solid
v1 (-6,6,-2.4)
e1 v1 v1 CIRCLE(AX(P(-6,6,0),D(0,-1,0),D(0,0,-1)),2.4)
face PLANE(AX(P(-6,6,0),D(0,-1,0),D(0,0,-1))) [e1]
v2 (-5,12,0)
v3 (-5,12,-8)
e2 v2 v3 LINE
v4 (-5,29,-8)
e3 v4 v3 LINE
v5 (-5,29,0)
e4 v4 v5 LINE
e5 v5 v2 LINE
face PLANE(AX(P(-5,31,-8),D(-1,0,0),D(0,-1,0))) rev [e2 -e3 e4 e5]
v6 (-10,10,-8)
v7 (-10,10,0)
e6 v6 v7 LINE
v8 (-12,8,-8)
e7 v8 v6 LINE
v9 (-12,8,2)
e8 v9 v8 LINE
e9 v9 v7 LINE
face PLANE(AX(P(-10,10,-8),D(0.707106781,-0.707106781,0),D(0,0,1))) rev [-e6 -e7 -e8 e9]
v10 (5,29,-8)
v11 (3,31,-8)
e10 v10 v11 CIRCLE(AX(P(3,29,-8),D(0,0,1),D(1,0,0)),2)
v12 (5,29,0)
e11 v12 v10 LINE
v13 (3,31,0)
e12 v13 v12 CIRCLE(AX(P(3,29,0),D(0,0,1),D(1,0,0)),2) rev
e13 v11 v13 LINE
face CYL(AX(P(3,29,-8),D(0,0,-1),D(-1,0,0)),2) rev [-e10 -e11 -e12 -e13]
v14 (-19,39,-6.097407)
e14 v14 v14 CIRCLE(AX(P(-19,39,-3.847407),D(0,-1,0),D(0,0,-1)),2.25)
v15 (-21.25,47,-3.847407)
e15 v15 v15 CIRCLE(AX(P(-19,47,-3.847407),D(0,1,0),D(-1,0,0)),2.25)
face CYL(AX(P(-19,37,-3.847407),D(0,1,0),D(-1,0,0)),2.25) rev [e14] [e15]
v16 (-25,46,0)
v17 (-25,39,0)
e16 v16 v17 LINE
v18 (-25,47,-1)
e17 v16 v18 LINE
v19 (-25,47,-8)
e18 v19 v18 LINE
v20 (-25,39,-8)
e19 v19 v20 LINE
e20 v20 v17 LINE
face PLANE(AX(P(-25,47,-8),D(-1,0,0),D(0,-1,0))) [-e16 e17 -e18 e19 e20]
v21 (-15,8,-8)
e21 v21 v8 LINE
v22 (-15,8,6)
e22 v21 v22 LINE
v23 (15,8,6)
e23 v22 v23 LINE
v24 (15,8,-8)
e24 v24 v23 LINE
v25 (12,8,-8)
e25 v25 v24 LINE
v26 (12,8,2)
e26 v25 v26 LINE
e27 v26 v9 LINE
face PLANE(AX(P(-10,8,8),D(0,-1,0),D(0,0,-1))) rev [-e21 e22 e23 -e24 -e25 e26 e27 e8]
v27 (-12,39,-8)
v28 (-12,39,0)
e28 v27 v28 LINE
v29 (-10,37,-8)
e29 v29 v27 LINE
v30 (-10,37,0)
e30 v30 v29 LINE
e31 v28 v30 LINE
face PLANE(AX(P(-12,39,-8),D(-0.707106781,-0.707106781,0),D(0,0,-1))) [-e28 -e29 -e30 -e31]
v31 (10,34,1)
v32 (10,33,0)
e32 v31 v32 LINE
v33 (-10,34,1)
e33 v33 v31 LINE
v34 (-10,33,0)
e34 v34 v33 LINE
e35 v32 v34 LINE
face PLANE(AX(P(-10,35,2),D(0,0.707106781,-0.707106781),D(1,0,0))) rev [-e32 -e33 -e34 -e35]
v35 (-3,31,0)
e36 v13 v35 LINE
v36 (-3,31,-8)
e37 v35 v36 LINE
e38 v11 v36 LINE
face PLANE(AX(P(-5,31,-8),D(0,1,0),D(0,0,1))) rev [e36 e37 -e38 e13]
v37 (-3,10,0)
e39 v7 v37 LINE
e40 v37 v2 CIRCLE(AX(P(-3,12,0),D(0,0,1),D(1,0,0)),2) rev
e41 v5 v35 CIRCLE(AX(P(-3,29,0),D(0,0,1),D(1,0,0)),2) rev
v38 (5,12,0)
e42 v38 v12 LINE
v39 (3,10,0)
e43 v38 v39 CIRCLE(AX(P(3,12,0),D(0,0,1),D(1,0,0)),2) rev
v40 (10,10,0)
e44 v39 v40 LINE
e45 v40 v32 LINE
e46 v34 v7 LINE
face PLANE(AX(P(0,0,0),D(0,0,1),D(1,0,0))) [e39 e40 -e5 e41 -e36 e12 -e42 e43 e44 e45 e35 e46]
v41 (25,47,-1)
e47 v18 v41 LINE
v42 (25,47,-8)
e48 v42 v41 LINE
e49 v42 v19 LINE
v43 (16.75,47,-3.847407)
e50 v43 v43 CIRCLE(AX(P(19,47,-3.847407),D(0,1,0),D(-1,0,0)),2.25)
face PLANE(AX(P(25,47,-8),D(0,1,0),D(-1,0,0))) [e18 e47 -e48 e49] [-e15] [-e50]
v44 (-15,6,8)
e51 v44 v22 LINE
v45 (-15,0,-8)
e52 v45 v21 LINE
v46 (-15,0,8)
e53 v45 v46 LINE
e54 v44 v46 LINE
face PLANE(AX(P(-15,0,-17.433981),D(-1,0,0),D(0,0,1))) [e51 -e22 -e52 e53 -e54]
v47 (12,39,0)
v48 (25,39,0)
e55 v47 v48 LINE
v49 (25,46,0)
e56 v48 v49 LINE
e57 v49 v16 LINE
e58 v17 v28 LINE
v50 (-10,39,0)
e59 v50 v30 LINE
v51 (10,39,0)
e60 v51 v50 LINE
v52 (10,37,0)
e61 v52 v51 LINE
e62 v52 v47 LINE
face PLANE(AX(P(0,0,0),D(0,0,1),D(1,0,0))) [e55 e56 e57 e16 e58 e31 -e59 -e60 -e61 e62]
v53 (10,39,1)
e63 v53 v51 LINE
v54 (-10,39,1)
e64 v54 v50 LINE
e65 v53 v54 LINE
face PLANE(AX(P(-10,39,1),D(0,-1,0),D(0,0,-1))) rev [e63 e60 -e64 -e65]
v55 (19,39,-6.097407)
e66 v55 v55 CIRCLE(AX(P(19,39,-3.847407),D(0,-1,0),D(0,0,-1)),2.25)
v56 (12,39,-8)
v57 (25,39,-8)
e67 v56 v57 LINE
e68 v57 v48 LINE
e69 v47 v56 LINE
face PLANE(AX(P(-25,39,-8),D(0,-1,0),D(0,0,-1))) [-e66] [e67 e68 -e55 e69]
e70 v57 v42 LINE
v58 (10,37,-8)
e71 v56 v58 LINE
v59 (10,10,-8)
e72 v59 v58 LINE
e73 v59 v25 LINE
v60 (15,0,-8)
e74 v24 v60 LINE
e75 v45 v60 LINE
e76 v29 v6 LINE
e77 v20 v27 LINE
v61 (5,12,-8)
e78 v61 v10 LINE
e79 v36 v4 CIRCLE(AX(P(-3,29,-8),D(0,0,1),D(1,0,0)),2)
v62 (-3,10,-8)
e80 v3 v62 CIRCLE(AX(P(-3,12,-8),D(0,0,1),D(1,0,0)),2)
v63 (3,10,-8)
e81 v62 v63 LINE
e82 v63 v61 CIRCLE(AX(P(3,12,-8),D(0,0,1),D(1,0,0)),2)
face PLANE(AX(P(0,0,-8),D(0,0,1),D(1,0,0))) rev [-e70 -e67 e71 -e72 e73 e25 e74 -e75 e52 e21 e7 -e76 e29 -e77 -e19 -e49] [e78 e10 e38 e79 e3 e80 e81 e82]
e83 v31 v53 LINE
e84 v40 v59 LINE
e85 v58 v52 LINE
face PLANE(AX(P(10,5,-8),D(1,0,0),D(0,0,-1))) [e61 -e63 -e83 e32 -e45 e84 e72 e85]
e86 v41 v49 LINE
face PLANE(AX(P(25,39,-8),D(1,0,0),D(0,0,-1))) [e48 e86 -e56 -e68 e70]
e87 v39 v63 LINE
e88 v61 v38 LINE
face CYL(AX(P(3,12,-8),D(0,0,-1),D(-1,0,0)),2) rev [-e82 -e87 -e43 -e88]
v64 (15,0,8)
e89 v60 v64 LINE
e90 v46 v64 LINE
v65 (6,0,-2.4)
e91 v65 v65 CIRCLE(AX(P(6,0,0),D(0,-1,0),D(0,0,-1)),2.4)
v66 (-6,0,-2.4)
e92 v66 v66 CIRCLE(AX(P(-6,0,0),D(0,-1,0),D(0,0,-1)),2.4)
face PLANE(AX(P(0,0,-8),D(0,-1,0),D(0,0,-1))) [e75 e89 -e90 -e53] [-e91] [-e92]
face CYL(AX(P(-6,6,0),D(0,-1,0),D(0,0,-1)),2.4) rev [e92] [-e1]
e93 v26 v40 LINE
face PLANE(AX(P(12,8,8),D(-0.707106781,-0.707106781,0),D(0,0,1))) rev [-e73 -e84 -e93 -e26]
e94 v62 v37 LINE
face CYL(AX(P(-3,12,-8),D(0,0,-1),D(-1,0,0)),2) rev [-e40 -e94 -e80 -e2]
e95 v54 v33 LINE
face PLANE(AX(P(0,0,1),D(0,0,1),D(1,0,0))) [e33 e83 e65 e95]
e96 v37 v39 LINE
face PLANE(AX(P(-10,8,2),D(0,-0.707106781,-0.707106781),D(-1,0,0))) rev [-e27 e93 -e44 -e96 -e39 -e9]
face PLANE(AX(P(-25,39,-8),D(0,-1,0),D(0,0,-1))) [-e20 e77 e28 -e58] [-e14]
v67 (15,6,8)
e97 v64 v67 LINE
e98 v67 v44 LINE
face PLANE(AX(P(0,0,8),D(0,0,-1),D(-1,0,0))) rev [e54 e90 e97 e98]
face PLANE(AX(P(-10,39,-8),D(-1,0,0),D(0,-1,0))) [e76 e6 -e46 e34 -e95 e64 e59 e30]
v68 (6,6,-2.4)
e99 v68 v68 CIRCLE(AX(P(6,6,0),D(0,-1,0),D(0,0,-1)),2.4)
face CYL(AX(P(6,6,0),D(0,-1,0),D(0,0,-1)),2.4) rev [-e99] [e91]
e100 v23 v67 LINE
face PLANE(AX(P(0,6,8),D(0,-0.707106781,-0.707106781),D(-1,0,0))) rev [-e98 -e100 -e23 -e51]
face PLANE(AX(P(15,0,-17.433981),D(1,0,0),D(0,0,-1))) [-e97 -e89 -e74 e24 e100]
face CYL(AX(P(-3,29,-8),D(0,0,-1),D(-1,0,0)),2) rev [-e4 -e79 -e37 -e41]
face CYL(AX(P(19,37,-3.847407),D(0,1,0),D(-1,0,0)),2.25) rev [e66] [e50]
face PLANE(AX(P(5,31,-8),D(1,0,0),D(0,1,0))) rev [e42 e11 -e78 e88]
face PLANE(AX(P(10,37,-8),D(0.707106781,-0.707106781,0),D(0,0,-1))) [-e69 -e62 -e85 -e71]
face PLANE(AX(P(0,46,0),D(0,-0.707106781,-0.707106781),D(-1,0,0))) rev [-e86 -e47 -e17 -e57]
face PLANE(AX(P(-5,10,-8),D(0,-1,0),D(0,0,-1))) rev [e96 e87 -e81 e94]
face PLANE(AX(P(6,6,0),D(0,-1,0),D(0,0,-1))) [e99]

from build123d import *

# Parameters (mm, degrees)
EXTRUDE_1_DEPTH     = 8
SKETCH_3_W          = 20
SKETCH_3_H          = 4
EXTRUDE_2_DEPTH     = 1
SKETCH_4_R          = 2.25
CUT_EXTRUDE_3_DEPTH = 10
CHAMFER_2_SIZE      = 1
CHAMFER_3_SIZE      = 2
CHAMFER_4_SIZE      = 2
SKETCH_6_W          = 20
SKETCH_6_H          = 8
EXTRUDE_3_DEPTH     = 8
SKETCH_7_W          = 10
SKETCH_7_H          = 21
CUT_EXTRUDE_4_DEPTH = 54.833075335
FILLET_1_R          = 2
SKETCH_8_R          = 2.4
CUT_EXTRUDE_5_DEPTH = 6
SKETCH_9_W          = 5
SKETCH_9_H          = 8
EXTRUDE_4_DEPTH     = 16
CHAMFER_5_SIZE      = 2
CHAMFER_6_SIZE      = 2


# Some blends are built 0.0001 mm under size
with BuildPart() as part:
    # ｽｹｯﾁ1 → ﾎﾞｽ - 押し出し1 (new body)
    with BuildSketch(Plane.XY):
        Polygon((-10, 0), (0, 0), (10, 0), (10, 5), (0, 5), (-10, 5), align=None)
        Polygon((0, 5), (10, 5), (10, 39), (-10, 39), (-10, 5), align=None)
        Polygon((-10, 39), (10, 39), (25, 39), (25, 47), (-25, 47), (-25, 39), align=None)
    extrude(amount=-EXTRUDE_1_DEPTH)

    # ｽｹｯﾁ3 → ﾎﾞｽ - 押し出し2 (add)
    with BuildSketch(Plane.XY):
        with Locations((0, 37)):
            Rectangle(SKETCH_3_W, SKETCH_3_H)
    extrude(amount=EXTRUDE_2_DEPTH)

    # ｽｹｯﾁ4 → ｶｯﾄ - 押し出し3 (cut)
    with BuildSketch(Plane(origin=(0, 47, 0), x_dir=(1, 0, 0), z_dir=(0, 1, 0))):
        with Locations(Location((19, 3.847406514, 0), (0, 0, 180))):
            Circle(SKETCH_4_R)
        with Locations(Location((-19, 3.847406514, 0), (0, 0, 180))):
            Circle(SKETCH_4_R)
    extrude(amount=-CUT_EXTRUDE_3_DEPTH, mode=Mode.SUBTRACT)

    # 面取り2
    chamfer_2_edges = [part.edges().sort_by_distance(p)[0] for p in [
        (0, 47, 0),
    ]]
    chamfer(chamfer_2_edges, length=CHAMFER_2_SIZE)

    # 面取り3
    chamfer_3_edges = [part.edges().sort_by_distance(p)[0] for p in [
        (-10, 39, -4),
        (10, 39, -4),
    ]]
    chamfer(chamfer_3_edges, length=CHAMFER_3_SIZE)

    # 面取り4
    # the kernel refuses this chamfer: 2 mm, written as the material it adds along each edge
    with BuildSketch(Plane(origin=(10, 35, 0), x_dir=(0, -0.9996219169112968, -0.02749587661058639), z_dir=(-1, 0, 0))) as chamfer_4_piece_1_section:
        Polygon((CHAMFER_4_SIZE * 0.999621916911, CHAMFER_4_SIZE * 0.0274958766106), (-CHAMFER_4_SIZE * 0.0274958766106, CHAMFER_4_SIZE * 0.999621916911), (0, 0), align=None)
    chamfer_4_piece_1 = extrude(amount=20, mode=Mode.PRIVATE)
    chamfer_4_piece_1 = split(chamfer_4_piece_1, bisect_by=Plane(origin=(0, 34.213197832, 1), z_dir=(0, 0, -1)), keep=Keep.TOP, mode=Mode.PRIVATE)
    add(chamfer_4_piece_1)

    # ｽｹｯﾁ6 → ﾎﾞｽ - 押し出し3 (add)
    with BuildSketch(Plane.XY):
        with Locations((0, 4)):
            Rectangle(SKETCH_6_W, SKETCH_6_H)
    extrude(amount=EXTRUDE_3_DEPTH)

    # ｽｹｯﾁ7 → ｶｯﾄ - 押し出し4 (cut, through all)
    with BuildSketch(Plane.XY):
        with Locations((0, 20.5)):
            Rectangle(SKETCH_7_W, SKETCH_7_H)
    extrude(amount=-CUT_EXTRUDE_4_DEPTH, mode=Mode.SUBTRACT)

    # ﾌｨﾚｯﾄ1
    fillet_1_edges = [part.edges().sort_by_distance(p)[0] for p in [
        (5, 31, -4),
        (5, 10, -4),
        (-5, 10, -4),
        (-5, 31, -4),
    ]]
    fillet(fillet_1_edges, radius=FILLET_1_R)

    # ｽｹｯﾁ8 → ｶｯﾄ - 押し出し5 (cut)
    with BuildSketch(Plane.XZ):
        with Locations(Location((-6, 0, 0), (0, 0, 270))):
            Circle(SKETCH_8_R)
        with Locations(Location((6, 0, 0), (0, 0, 270))):
            Circle(SKETCH_8_R)
    extrude(amount=-CUT_EXTRUDE_5_DEPTH, mode=Mode.SUBTRACT)

    # ｽｹｯﾁ9 → ﾎﾞｽ - 押し出し4 (add)
    with BuildSketch(Plane.XY.offset(8)):
        with Locations((12.5, 4)):
            Rectangle(SKETCH_9_W, SKETCH_9_H)
        with Locations((-12.5, 4)):
            Rectangle(SKETCH_9_W, SKETCH_9_H)
    extrude(amount=-EXTRUDE_4_DEPTH)

    # 面取り5
    chamfer_5_edges = [part.edges().sort_by_distance(p)[0] for p in [
        (0, 8, 8),
    ]]
    chamfer(chamfer_5_edges, length=CHAMFER_5_SIZE)

    # 面取り6
    chamfer_6_edges = [part.edges().sort_by_distance(p)[0] for p in [
        (0, 8, 0),
        (10, 8, -4),
        (-10, 8, -4),
    ]]
    chamfer(chamfer_6_edges, length=CHAMFER_6_SIZE - 0.0001)  # a hair under: the kernel refuses the full size


solid = part.part
